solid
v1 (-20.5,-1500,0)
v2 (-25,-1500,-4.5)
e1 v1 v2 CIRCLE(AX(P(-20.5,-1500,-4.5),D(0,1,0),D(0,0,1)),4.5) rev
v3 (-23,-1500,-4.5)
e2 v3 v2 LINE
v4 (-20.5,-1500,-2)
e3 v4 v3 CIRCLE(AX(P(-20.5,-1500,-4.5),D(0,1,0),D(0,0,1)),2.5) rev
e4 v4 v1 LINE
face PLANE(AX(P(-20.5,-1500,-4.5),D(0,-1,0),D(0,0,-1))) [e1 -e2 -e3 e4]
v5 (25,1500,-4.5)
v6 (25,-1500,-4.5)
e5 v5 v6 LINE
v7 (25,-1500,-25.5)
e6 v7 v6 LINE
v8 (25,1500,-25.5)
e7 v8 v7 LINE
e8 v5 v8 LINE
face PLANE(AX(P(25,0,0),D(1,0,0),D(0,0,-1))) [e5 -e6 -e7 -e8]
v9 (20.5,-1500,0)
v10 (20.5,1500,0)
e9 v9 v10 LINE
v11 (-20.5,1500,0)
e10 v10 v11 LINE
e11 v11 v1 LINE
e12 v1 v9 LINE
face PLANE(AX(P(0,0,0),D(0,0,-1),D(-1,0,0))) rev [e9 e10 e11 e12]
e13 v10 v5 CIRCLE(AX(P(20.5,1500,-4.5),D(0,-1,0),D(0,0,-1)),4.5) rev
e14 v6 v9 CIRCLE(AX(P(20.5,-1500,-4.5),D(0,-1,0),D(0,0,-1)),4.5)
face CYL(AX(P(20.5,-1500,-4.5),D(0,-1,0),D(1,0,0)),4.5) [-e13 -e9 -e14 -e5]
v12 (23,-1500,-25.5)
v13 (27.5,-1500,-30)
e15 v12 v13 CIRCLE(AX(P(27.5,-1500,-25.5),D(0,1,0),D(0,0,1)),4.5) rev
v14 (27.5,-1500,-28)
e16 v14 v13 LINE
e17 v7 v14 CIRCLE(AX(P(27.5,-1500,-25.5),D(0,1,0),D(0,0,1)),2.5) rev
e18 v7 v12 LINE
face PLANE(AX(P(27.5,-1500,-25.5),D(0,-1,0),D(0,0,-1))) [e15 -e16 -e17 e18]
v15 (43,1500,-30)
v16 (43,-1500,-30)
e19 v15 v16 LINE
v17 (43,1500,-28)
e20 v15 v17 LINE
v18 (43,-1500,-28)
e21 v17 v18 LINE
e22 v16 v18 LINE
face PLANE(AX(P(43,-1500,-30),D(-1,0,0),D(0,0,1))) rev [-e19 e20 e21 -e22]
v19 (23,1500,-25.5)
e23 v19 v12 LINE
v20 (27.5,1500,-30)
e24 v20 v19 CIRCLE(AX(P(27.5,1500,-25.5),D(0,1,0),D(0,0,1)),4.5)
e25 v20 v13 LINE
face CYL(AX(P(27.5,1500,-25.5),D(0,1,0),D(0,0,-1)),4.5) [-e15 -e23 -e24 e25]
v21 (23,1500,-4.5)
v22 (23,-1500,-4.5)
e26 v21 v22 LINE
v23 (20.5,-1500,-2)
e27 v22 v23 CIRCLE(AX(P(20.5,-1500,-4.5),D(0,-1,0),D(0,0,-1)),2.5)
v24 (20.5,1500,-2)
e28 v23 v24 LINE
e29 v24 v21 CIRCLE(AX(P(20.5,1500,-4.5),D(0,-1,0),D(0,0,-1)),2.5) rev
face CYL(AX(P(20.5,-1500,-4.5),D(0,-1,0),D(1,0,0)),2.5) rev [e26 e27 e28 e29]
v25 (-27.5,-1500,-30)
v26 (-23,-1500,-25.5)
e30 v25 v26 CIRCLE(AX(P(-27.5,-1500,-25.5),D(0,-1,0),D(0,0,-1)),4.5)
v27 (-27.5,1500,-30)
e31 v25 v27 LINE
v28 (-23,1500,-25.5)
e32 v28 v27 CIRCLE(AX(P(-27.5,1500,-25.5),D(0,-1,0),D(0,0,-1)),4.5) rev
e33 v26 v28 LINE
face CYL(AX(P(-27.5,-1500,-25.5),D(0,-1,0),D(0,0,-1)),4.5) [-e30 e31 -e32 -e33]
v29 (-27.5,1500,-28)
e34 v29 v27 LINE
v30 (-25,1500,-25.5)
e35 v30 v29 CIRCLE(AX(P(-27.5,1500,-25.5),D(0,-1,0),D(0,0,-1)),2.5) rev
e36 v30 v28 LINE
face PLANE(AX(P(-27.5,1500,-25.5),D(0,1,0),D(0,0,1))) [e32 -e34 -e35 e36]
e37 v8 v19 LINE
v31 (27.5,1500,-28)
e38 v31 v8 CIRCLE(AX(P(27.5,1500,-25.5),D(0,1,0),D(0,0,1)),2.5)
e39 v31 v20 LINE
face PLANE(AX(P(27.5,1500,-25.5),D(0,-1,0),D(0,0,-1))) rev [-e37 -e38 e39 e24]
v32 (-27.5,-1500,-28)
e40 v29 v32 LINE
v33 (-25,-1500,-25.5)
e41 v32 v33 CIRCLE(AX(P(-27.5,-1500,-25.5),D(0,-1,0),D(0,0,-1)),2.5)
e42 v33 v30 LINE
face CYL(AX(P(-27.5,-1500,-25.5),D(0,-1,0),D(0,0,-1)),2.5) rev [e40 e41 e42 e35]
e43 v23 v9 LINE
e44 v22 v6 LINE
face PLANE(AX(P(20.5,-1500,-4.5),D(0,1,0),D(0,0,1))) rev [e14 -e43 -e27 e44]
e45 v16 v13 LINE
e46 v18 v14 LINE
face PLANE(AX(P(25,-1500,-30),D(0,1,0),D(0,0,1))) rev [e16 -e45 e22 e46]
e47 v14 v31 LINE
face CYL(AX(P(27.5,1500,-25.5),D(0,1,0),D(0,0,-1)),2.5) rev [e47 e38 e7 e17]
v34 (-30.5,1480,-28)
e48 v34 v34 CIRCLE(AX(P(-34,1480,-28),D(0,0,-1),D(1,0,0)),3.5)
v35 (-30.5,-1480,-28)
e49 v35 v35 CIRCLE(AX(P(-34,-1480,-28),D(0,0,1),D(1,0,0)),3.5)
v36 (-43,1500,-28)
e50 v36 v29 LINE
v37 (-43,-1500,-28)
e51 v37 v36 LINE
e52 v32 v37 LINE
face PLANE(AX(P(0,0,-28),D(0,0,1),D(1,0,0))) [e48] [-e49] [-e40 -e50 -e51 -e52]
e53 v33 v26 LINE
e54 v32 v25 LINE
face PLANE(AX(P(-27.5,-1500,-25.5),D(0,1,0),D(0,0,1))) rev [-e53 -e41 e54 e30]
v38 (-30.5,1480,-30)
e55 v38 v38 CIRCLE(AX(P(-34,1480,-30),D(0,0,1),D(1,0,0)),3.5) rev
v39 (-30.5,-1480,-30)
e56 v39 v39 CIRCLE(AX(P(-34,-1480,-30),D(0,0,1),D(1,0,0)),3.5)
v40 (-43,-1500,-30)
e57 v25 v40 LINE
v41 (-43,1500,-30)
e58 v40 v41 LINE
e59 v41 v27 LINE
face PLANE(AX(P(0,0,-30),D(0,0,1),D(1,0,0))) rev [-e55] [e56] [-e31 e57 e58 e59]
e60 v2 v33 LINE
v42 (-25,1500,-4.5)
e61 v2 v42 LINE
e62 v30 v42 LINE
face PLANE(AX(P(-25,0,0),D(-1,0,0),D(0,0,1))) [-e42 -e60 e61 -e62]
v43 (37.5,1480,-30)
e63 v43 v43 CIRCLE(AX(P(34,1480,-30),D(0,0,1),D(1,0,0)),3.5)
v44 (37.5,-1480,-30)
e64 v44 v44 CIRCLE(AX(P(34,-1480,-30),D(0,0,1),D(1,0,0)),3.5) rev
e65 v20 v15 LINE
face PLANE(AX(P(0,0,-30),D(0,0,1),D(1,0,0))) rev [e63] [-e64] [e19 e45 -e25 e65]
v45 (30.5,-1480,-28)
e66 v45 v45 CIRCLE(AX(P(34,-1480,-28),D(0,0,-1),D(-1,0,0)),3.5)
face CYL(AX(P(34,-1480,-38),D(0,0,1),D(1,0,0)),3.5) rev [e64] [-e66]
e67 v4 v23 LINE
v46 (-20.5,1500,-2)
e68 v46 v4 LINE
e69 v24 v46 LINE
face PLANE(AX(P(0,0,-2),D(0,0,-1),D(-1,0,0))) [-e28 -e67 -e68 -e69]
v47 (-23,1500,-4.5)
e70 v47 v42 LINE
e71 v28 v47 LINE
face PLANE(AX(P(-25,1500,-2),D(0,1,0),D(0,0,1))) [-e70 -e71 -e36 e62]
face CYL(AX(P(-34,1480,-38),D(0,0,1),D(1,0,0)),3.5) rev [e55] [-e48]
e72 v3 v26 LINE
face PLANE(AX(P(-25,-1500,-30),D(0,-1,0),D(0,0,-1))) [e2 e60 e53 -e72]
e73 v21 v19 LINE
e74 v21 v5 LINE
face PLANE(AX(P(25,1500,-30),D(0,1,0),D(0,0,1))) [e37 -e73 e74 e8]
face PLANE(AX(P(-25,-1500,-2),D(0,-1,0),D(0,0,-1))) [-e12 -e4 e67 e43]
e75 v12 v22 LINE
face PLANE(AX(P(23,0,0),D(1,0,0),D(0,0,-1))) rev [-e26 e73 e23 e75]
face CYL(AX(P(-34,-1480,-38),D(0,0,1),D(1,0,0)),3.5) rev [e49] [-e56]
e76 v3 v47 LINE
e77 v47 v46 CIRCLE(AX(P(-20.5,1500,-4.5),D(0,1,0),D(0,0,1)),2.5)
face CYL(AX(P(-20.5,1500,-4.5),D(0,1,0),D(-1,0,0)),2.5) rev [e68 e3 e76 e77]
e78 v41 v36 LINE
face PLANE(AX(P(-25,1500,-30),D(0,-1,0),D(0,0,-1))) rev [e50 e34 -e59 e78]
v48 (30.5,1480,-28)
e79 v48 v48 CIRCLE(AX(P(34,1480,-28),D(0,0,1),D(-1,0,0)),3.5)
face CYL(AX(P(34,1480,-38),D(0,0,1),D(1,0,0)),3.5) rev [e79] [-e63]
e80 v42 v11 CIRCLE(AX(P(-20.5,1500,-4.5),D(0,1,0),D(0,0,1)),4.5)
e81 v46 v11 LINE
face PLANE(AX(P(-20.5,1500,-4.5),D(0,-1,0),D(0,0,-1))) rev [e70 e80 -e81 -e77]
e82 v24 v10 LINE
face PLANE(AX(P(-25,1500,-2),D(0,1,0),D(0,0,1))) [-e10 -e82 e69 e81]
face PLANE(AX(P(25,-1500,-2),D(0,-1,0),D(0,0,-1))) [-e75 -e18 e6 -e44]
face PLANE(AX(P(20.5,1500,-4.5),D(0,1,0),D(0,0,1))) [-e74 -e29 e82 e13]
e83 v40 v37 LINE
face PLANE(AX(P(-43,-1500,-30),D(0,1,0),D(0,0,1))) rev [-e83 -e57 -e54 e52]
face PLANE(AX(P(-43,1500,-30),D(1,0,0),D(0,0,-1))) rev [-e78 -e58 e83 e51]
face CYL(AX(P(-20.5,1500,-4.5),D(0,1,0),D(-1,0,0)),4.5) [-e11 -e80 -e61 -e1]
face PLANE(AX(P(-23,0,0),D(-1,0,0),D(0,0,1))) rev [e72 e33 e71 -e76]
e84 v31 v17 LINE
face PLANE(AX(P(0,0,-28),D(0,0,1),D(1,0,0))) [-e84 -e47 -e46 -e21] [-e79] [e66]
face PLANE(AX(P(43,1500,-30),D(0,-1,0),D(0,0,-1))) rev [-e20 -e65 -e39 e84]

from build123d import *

# Parameters (mm, degrees)
SKETCH1_W                      = 50
SKETCH1_H                      = 3000
BASE_FLANGE1_DEPTH             = 2
EDGE_FLANGE1_STRIP_W           = 13
EDGE_FLANGE1_STRIP_H           = 2
EDGE_FLANGE1_STRIP_CUT_DEPTH   = 3000
EDGE_FLANGE1_STRIP_2_W         = 13
EDGE_FLANGE1_STRIP_2_H         = 2
EDGE_FLANGE1_STRIP_CUT_2_DEPTH = 3000
EDGE_FLANGE1_DEPTH             = 3000
EDGE_FLANGE1_BEND_DEPTH        = 3000
EDGE_FLANGE2_STRIP_W           = 13
EDGE_FLANGE2_STRIP_H           = 2
EDGE_FLANGE2_STRIP_CUT_DEPTH   = 3000
EDGE_FLANGE2_STRIP_2_W         = 13
EDGE_FLANGE2_STRIP_2_H         = 2
EDGE_FLANGE2_STRIP_CUT_2_DEPTH = 3000
EDGE_FLANGE2_DEPTH             = 3000
EDGE_FLANGE2_BEND_DEPTH        = 3000
SKETCH18_R                     = 3.5
CUT_EXTRUDE1_DEPTH             = 10
MIRROR2_COPY_1_SKETCH_R        = 3.5
MIRROR2_COPY_1_DEPTH           = 10


# Sheet-metal steps are written as plain solids
with BuildPart() as part:
    # Sketch1 → Base-Flange1 (new body)
    with BuildSketch(Plane.XY):
        Rectangle(SKETCH1_W, SKETCH1_H)
    extrude(amount=-BASE_FLANGE1_DEPTH)

    # Edge-Flange1 strip (across the edge) → Edge-Flange1 strip cut (cut)
    with BuildSketch(Plane(origin=(25, 1500, -2), x_dir=(-1, 0, 0), z_dir=(0, -1, 0))):
        with Locations((-2, -1)):
            Rectangle(EDGE_FLANGE1_STRIP_W, EDGE_FLANGE1_STRIP_H)
    extrude(amount=EDGE_FLANGE1_STRIP_CUT_DEPTH, mode=Mode.SUBTRACT)

    # Edge-Flange1 strip 2 (across the edge) → Edge-Flange1 strip cut 2 (cut)
    with BuildSketch(Plane(origin=(-25, -1500, -2), x_dir=(1, 0, 0), z_dir=(0, 1, 0))):
        with Locations((-2, -1)):
            Rectangle(EDGE_FLANGE1_STRIP_2_W, EDGE_FLANGE1_STRIP_2_H)
    extrude(amount=EDGE_FLANGE1_STRIP_CUT_2_DEPTH, mode=Mode.SUBTRACT)

    # Edge-Flange1 section (across the edge) → Edge-Flange1 (add)
    with BuildSketch(Plane(origin=(25, 1500, -2), x_dir=(-1, 0, 0), z_dir=(0, -1, 0))):
        with BuildLine():
            Line((0, 2.5), (0, 28))
            Line((0, 28), (2, 28))
            Line((2, 28), (2, 2.5))
            ThreePointArc((2, 2.5), (2.732233047, 0.732233047), (4.5, 0))
            Line((4.5, 0), (4.5, -2))
            ThreePointArc((4.5, -2), (1.318019485, -0.681980515), (0, 2.5))
        make_face()
    extrude(amount=EDGE_FLANGE1_DEPTH)

    # Edge-Flange1 section 2 (across the edge) → Edge-Flange1 bend (add)
    with BuildSketch(Plane(origin=(-25, -1500, -2), x_dir=(1, 0, 0), z_dir=(0, 1, 0))):
        with BuildLine():
            Line((0, 2.5), (0, 28))
            Line((0, 28), (2, 28))
            Line((2, 28), (2, 2.5))
            ThreePointArc((2, 2.5), (2.732233047, 0.732233047), (4.5, 0))
            Line((4.5, 0), (4.5, -2))
            ThreePointArc((4.5, -2), (1.318019485, -0.681980515), (0, 2.5))
        make_face()
    extrude(amount=EDGE_FLANGE1_BEND_DEPTH)

    # Edge-Flange2 strip (across the edge) → Edge-Flange2 strip cut (cut)
    with BuildSketch(Plane(origin=(-25, 1500, -30), x_dir=(0, 0, 1), z_dir=(0, -1, 0))):
        with Locations((-2, -1)):
            Rectangle(EDGE_FLANGE2_STRIP_W, EDGE_FLANGE2_STRIP_H)
    extrude(amount=EDGE_FLANGE2_STRIP_CUT_DEPTH, mode=Mode.SUBTRACT)

    # Edge-Flange2 strip 2 (across the edge) → Edge-Flange2 strip cut 2 (cut)
    with BuildSketch(Plane(origin=(25, -1500, -30), x_dir=(0, 0, 1), z_dir=(0, 1, 0))):
        with Locations((-2, -1)):
            Rectangle(EDGE_FLANGE2_STRIP_2_W, EDGE_FLANGE2_STRIP_2_H)
    extrude(amount=EDGE_FLANGE2_STRIP_CUT_2_DEPTH, mode=Mode.SUBTRACT)

    # Edge-Flange2 section (across the edge) → Edge-Flange2 (add)
    with BuildSketch(Plane(origin=(-25, 1500, -30), x_dir=(0, 0, 1), z_dir=(0, -1, 0))):
        with BuildLine():
            Line((0, 2.5), (0, 18))
            Line((0, 18), (2, 18))
            Line((2, 18), (2, 2.5))
            ThreePointArc((2, 2.5), (2.732233047, 0.732233047), (4.5, 0))
            Line((4.5, 0), (4.5, -2))
            ThreePointArc((4.5, -2), (1.318019485, -0.681980515), (0, 2.5))
        make_face()
    extrude(amount=EDGE_FLANGE2_DEPTH)

    # Edge-Flange2 section 2 (across the edge) → Edge-Flange2 bend (add)
    with BuildSketch(Plane(origin=(25, -1500, -30), x_dir=(0, 0, 1), z_dir=(0, 1, 0))):
        with BuildLine():
            Line((0, 2.5), (0, 18))
            Line((0, 18), (2, 18))
            Line((2, 18), (2, 2.5))
            ThreePointArc((2, 2.5), (2.732233047, 0.732233047), (4.5, 0))
            Line((4.5, 0), (4.5, -2))
            ThreePointArc((4.5, -2), (1.318019485, -0.681980515), (0, 2.5))
        make_face()
    extrude(amount=EDGE_FLANGE2_BEND_DEPTH)

    # Sketch18 → Cut-Extrude1 (cut)
    with BuildSketch(Plane.XY.offset(-28)):
        with Locations((-34, -1480)):
            Circle(SKETCH18_R)
    cut_extrude1 = extrude(amount=-CUT_EXTRUDE1_DEPTH, mode=Mode.SUBTRACT)

    # Mirror1: Cut-Extrude1 across plane
    add(cut_extrude1.mirror(Plane.ZX), mode=Mode.SUBTRACT)

    # Mirror2: Cut-Extrude1 across plane
    add(cut_extrude1.mirror(Plane(origin=(0, 0, 0), x_dir=(0, 0, 1), z_dir=(1, 0, 0))), mode=Mode.SUBTRACT)

    # Mirror2 copy 1 sketch → Mirror2 copy 1 (cut)
    with BuildSketch(Plane(origin=(0, 0, -28), x_dir=(-1, 0, 0), z_dir=(0, 0, 1))):
        with Locations((-34, -1480)):
            Circle(MIRROR2_COPY_1_SKETCH_R)
    extrude(amount=-MIRROR2_COPY_1_DEPTH, mode=Mode.SUBTRACT)


solid = part.part
